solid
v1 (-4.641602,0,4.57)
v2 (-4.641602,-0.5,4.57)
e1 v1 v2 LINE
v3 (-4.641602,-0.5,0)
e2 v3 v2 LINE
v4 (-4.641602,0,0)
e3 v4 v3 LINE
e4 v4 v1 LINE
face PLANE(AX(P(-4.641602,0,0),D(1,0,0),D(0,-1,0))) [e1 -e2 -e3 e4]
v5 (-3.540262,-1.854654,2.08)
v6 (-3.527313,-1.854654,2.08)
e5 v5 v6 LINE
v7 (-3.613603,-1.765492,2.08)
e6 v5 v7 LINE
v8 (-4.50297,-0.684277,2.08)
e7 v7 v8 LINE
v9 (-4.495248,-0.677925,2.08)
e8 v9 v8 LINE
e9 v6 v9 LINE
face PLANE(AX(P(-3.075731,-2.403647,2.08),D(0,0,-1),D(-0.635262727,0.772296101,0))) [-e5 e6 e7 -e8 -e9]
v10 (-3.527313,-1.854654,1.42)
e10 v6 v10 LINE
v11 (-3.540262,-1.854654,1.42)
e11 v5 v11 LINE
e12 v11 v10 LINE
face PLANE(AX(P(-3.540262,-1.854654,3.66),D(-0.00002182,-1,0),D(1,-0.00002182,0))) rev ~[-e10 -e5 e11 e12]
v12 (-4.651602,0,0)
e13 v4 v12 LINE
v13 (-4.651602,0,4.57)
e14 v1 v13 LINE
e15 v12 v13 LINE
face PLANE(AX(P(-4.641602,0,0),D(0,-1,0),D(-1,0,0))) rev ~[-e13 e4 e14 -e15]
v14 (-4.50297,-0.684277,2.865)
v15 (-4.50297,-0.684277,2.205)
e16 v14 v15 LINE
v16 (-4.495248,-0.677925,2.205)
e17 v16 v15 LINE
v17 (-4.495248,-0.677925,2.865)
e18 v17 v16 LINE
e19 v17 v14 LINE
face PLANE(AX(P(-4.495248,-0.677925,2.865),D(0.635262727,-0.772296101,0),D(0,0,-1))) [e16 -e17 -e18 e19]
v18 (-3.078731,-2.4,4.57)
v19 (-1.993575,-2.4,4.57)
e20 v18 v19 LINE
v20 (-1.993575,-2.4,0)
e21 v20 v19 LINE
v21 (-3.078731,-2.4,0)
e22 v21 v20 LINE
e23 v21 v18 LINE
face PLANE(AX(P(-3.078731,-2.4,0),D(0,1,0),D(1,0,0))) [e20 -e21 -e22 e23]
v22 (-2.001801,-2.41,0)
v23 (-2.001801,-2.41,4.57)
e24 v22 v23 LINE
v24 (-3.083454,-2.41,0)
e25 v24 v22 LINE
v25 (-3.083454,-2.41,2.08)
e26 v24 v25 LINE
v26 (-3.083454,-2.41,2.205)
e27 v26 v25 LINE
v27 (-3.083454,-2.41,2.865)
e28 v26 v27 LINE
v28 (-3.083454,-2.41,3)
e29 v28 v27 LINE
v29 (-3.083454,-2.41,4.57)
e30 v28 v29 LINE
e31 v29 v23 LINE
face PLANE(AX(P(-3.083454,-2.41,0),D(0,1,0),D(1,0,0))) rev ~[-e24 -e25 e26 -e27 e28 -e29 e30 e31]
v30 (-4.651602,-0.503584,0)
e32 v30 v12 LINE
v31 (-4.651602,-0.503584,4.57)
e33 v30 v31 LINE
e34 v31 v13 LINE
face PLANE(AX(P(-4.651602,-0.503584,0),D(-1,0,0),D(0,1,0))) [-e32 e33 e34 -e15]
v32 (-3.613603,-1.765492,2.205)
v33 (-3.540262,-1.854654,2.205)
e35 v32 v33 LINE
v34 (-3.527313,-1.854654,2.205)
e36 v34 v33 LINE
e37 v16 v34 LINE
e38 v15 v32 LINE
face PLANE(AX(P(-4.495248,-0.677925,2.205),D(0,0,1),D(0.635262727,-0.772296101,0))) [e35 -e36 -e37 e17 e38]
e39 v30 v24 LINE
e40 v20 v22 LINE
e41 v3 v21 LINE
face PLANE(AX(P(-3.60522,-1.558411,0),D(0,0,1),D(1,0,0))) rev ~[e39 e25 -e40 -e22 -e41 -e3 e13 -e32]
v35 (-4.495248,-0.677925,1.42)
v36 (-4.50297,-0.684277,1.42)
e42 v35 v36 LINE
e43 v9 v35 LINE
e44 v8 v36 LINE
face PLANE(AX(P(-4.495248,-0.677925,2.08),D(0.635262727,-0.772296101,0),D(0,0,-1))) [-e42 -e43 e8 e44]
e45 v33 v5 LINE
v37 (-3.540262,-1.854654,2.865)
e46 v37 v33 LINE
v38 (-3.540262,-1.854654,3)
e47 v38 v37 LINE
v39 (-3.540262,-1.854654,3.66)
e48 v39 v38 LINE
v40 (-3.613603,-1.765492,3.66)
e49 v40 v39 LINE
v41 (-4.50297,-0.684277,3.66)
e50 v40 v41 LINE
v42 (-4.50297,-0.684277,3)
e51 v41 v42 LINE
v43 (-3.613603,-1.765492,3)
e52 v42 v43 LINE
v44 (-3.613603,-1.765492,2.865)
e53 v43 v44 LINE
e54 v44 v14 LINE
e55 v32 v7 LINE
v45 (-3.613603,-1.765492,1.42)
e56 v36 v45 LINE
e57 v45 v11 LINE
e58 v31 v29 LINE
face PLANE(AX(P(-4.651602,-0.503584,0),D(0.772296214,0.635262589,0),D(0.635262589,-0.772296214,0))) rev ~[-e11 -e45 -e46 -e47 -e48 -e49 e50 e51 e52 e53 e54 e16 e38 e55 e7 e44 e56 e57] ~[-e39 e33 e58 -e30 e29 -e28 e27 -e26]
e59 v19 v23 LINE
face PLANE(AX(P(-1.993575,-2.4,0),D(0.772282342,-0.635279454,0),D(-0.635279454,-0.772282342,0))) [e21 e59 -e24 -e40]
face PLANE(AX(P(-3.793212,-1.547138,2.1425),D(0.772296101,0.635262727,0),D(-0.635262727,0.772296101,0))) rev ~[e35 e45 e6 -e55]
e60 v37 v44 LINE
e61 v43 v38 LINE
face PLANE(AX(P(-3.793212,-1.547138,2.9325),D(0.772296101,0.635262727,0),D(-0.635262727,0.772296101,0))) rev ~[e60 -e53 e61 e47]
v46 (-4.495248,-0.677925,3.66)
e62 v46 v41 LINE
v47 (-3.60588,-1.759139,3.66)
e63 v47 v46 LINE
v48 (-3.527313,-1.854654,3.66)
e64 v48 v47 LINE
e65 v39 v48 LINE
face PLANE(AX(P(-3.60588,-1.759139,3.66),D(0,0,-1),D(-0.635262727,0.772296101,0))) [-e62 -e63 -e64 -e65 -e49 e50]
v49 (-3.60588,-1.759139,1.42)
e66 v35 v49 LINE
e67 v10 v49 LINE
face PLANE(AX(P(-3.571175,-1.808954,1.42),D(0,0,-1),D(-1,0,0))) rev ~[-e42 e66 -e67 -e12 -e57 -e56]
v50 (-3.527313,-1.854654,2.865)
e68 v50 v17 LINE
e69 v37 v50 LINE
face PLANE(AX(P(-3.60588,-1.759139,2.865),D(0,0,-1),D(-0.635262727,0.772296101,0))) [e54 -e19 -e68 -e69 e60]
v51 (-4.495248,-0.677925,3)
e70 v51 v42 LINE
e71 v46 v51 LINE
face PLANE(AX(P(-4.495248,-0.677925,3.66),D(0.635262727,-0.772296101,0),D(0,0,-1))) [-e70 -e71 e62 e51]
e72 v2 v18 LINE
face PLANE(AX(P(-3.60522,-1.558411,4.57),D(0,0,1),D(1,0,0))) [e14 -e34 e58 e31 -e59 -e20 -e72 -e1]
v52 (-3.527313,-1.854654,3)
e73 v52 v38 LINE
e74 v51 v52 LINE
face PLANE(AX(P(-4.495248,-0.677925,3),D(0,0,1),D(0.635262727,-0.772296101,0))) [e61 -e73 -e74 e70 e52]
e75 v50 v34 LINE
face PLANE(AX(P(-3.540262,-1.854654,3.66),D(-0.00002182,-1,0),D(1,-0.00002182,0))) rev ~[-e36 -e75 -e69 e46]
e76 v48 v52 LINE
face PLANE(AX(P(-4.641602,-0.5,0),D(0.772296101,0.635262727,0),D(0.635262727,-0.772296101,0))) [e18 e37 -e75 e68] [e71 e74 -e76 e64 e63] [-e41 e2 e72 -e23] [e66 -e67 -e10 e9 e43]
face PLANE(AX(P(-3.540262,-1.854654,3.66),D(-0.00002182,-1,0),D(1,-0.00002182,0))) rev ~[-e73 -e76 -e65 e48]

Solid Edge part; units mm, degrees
sketch "Sketch1" plane through (0, 0, 0) normal (0, 0, 1) x (1, 0, 0)
  line L0 (-4.651602, -0.503584) -> (-3.083454, -2.41)
  line L1 (-3.083454, -2.41) -> (-2.001801, -2.41)
  line L2 (-1.993575, -2.4) -> (-2.001801, -2.41)
  line L3 (-3.078731, -2.4) -> (-1.993575, -2.4)
  line L4 (-4.641602, -0.5) -> (-3.078731, -2.4)
  line L5 (-4.641602, 0) -> (-4.641602, -0.5)
  line L6 (-4.641602, 0) -> (-4.651602, 0)
  line L7 (-4.651602, -0.503584) -> (-4.651602, 0)
  dimension "D1" = 4.641602
extrude "Protrusion1" add sketch "Sketch1" along normal blind 4.57
sketch "Sketch2" plane through (-3.901295, -1.4, 2.325) normal (0.7722962, 0.6352626, 0) x (0, 0, 1)
  line L0 (1.335, 0.465028) -> (1.335, -0.934972)
  line L1 (1.335, -0.934972) -> (0.675, -0.934972)
  line L2 (0.675, -0.934972) -> (0.675, 0.465028)
  line L3 (0.675, 0.465028) -> (1.335, 0.465028)
  line L4 (-0.12, 0.465028) -> (0.54, 0.465028)
  line L5 (0.54, 0.465028) -> (0.54, -0.934972)
  line L6 (0.54, -0.934972) -> (-0.12, -0.934972)
  line L7 (-0.12, -0.934972) -> (-0.12, 0.465028)
  line L8 (-0.905, 0.465028) -> (-0.245, 0.465028)
  line L9 (-0.245, 0.465028) -> (-0.245, -0.934972)
  line L10 (-0.245, -0.934972) -> (-0.905, -0.934972)
  line L11 (-0.905, -0.934972) -> (-0.905, 0.465028)
extrude "Cutout1" cut sketch "Sketch2" against normal through all
sketch "Sketch3" plane through (-4.054426, -1.221708, 3.66) normal (0, 0, -1) x (-0.6352626, 0.7722962, 0)
  line L0 (-0.7, -0.005) -> (-0.7, 0.005)
  line L1 (-0.823677, 0.005) -> (-0.7, 0.005)
  line L2 (-0.815451, -0.005) -> (-0.823677, 0.005)
  line L3 (-0.7, -0.005) -> (-0.815451, -0.005)
extrude "Cutout2" cut sketch "Sketch3" along normal up to surface (2.24 mm away)
sketch "Sketch4" plane through (-3.860167, -1.45, 2.285) normal (0.7722962, 0.6352626, 0) x (0, 0, 1)
  line L0 (0.715, -0.999714) -> (0.715, 1.234821)
  line L1 (0.715, 1.234821) -> (0.58, 1.234821)
  line L2 (0.58, 1.234821) -> (0.58, -0.999714)
  line L3 (0.715, -0.999714) -> (0.58, -0.999714)
  line L4 (-0.08, -0.999714) -> (-0.08, 1.234821)
  line L5 (-0.08, 1.234821) -> (-0.205, 1.234821)
  line L6 (-0.205, 1.234821) -> (-0.205, -0.999714)
  line L7 (-0.08, -0.999714) -> (-0.205, -0.999714)
extrude "Protrusion2" add sketch "Sketch4" against normal up to surface (0.01 mm away)
